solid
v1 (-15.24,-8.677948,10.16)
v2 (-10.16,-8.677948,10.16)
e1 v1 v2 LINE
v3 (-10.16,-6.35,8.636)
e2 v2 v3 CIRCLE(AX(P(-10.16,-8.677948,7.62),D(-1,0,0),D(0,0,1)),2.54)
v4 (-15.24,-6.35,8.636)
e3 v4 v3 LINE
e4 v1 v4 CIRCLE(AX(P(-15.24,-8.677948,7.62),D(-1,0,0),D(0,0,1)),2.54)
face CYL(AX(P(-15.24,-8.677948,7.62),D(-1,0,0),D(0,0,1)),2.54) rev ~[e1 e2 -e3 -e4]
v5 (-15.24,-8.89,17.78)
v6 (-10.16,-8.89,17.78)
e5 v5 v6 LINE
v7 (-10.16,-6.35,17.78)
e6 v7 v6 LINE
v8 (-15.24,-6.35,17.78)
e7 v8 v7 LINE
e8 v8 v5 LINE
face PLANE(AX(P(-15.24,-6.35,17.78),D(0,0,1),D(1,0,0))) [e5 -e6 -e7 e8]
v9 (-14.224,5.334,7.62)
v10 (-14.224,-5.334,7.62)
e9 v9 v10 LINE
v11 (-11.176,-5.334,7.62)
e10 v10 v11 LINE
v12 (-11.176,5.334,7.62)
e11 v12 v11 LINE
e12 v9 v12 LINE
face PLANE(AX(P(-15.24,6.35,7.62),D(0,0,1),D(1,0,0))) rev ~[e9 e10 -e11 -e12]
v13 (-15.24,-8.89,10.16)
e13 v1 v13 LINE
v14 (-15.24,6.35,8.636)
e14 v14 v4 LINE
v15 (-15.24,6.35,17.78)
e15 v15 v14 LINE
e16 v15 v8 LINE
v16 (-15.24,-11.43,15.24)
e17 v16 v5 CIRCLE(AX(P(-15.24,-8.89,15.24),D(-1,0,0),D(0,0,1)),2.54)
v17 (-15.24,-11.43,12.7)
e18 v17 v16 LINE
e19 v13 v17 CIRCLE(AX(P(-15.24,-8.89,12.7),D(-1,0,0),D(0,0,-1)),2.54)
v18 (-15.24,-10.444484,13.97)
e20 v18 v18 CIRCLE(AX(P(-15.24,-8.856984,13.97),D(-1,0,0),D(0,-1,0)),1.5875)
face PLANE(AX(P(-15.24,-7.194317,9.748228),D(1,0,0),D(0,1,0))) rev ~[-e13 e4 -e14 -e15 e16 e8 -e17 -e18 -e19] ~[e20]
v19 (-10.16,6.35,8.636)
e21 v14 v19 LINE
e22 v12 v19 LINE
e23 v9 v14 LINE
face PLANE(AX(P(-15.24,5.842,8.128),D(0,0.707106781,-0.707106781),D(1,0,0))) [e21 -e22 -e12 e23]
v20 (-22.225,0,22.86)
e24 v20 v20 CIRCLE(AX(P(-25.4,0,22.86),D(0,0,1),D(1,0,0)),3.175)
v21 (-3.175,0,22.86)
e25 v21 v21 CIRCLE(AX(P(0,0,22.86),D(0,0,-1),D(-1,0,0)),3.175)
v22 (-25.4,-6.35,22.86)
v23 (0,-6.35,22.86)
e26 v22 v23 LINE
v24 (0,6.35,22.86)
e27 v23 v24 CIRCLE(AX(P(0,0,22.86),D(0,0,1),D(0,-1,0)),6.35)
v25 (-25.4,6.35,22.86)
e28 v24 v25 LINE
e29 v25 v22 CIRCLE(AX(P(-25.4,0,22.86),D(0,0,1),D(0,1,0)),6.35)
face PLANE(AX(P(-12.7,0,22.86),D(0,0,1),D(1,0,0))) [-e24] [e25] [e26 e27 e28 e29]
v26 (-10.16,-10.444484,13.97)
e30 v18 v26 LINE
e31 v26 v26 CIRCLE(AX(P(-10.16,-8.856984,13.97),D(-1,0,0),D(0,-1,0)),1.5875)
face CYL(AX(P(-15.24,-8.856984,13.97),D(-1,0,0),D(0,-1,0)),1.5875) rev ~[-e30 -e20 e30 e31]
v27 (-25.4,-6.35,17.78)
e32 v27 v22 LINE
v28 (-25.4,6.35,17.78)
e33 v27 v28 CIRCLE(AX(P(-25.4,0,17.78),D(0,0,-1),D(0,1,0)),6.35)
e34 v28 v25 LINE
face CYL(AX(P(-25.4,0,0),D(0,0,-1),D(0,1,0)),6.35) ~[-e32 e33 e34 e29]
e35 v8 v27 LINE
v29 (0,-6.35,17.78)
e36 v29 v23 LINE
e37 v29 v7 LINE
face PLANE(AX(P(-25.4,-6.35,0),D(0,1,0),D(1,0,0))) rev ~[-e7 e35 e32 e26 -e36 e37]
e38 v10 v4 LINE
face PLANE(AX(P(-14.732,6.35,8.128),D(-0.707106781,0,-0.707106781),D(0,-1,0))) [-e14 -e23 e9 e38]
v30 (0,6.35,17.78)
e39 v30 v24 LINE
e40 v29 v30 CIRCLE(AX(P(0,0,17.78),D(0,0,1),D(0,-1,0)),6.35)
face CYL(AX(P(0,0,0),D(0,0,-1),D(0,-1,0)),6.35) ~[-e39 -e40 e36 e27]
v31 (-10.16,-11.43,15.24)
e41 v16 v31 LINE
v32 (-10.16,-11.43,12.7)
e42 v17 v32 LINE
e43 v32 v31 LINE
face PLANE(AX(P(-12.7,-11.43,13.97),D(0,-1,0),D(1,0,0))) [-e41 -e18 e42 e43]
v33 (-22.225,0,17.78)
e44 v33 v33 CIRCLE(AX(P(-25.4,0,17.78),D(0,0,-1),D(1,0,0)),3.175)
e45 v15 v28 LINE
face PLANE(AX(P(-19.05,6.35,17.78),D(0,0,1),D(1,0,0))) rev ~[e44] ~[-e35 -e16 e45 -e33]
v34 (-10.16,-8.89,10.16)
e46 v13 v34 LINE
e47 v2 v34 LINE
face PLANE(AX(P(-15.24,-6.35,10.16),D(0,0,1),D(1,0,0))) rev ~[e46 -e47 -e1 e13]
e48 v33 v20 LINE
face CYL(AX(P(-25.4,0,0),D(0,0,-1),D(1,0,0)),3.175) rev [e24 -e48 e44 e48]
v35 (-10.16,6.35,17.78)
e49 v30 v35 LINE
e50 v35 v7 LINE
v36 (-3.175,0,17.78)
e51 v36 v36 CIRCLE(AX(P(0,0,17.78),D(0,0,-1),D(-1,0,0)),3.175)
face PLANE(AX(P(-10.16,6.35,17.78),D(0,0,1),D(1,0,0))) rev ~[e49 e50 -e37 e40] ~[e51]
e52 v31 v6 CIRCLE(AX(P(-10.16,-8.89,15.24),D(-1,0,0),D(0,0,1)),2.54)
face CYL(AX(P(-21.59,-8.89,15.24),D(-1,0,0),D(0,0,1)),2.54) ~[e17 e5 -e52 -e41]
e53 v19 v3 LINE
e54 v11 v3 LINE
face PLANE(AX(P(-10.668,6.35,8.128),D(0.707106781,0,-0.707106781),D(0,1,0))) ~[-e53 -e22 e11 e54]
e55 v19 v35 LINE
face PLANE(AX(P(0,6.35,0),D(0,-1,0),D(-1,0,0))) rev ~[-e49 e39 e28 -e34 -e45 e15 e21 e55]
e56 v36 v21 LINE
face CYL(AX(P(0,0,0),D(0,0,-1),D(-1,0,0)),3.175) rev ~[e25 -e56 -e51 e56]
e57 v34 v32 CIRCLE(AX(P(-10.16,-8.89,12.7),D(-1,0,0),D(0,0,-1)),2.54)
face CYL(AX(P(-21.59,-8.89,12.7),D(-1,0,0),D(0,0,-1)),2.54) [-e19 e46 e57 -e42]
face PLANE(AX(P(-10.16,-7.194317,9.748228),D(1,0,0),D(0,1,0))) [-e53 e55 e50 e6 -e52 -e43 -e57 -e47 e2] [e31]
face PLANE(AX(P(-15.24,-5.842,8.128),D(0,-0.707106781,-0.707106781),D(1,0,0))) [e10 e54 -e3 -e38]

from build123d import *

# Parameters (mm, degrees)
F0_R         = 3.175
F1_DEPTH     = 22.86
F2_W         = 6.35
F2_H         = 6.35
F2_W_2       = 6.7925655007
F3_DEPTH     = 25.4
F5_DEPTH     = 25.4
F6_SIZE      = 1.016
F7_W         = 5.08
F7_H         = 7.62
F8_DEPTH     = 5.08
F9_R         = 1.5875
F10_DEPTH    = 25.4
F11_T1_DEPTH = 5.08
F11_T3_DEPTH = 17.78
F11_T5_DEPTH = 17.78


# Not quite as in the source:
# - a fillet or chamfer that OpenCascade refuses, or shapes differently, is made with other operations: its cross-section is extruded or revolved along the edge and cut away or added


with BuildPart() as f1:
    # F0 (on Top) → F1 (new body)
    with BuildSketch(Plane.XY):
        with BuildLine():
            Line((0, 6.35), (-25.4, 6.35))
            ThreePointArc((-25.4, 6.35), (-31.75, 0), (-25.4, -6.35))
            Line((-25.4, -6.35), (0, -6.35))
            ThreePointArc((0, -6.35), (6.35, 0), (0, 6.35))
        make_face()
        with Locations((-25.4, 0)):
            Circle(F0_R, mode=Mode.SUBTRACT)
        with BuildLine():
            ThreePointArc((3.175, 0), (0, -3.175), (-3.175, 0))
            ThreePointArc((-3.175, 0), (0, 3.175), (3.175, 0))
        make_face(mode=Mode.SUBTRACT)
    extrude(amount=F1_DEPTH)

    # F2 (on face) → F3 (cut)
    with BuildSketch(Plane(origin=(0, 6.35, 0), x_dir=(-1, 0, 0), z_dir=(0, 1, 0))):
        with Locations((-3.175, 8.255)):
            Rectangle(F2_W, F2_H)
        with Locations((28.7962827504, 14.605)):
            Rectangle(F2_W_2, F2_H)
        with Locations((28.7962827504, 8.255)):
            Rectangle(F2_W_2, F2_H)
        with Locations((3.175, 8.255)):
            Rectangle(F2_W, F2_H)
        with Locations((3.175, 14.605)):
            Rectangle(F2_W, F2_H)
        with Locations((22.225, 14.605)):
            Rectangle(F2_W, F2_H)
        with Locations((22.225, 8.255)):
            Rectangle(F2_W, F2_H)
        with Locations((-3.175, 14.605)):
            Rectangle(F2_W, F2_H)
    extrude(amount=-F3_DEPTH, mode=Mode.SUBTRACT)

    # F4 (on face) → F5 (cut)
    with BuildSketch(Plane(origin=(0, 6.35, 0), x_dir=(-1, 0, 0), z_dir=(0, 1, 0))):
        Polygon((10.16, 17.78), (6.35, 17.78), (-14.3396928906, 11.8959285319), (-15.9743130207, -5.6489794515), (34.4809181988, -5.6489794515), (40.5834950507, 3.3959113061), (19.05, 17.78), (15.24, 17.78), (15.24, 7.62), (10.16, 7.62), align=None)
    extrude(amount=-F5_DEPTH, mode=Mode.SUBTRACT)

    # F6
    f6_edges = [f1.edges().sort_by_distance(p)[0] for p in [
        (-15.24, 0, 7.62),
        (-10.16, 0, 7.62),
        (-12.7, -6.35, 7.62),
        (-12.7, 6.35, 7.62),
    ]]
    chamfer(f6_edges, length=F6_SIZE)

    # F7 (on face) → F8 (join)
    with BuildSketch(Plane.XZ.offset(6.35)):
        with Locations((-12.7, 13.97)):
            Rectangle(F7_W, F7_H)
    extrude(amount=F8_DEPTH)

    # F9 (on face) → F10 (cut)
    with BuildSketch(Plane(origin=(-15.24, 0, 0), x_dir=(0, -1, 0), z_dir=(-1, 0, 0))):
        with Locations((8.8569838554, 13.97)):
            Circle(F9_R)
    extrude(amount=-F10_DEPTH, mode=Mode.SUBTRACT)

    # F11: fillet of radius 2.54 on 3 edges, made by hand

    # F11_s2 → F11_t1 (join)
    with BuildSketch(Plane.YZ.offset(-15.24)):
        with BuildLine():
            ThreePointArc((-8.677948453, 10.16), (-7.286733157, 9.7451164674), (-6.35, 8.636))
            Line((-6.35, 8.636), (-6.35, 10.16))
            Line((-6.35, 10.16), (-8.677948453, 10.16))
        make_face()
    extrude(amount=F11_T1_DEPTH)

    # F11_s4 → F11_t3 (cut)
    with BuildSketch(Plane.YZ.offset(-21.59)):
        with BuildLine():
            ThreePointArc((-8.89, 17.78), (-10.6860512242, 17.0360512242), (-11.43, 15.24))
            Line((-11.43, 15.24), (-11.43, 17.78))
            Line((-11.43, 17.78), (-8.89, 17.78))
        make_face()
    extrude(amount=F11_T3_DEPTH, mode=Mode.SUBTRACT)

    # F11_s6 → F11_t5 (cut)
    with BuildSketch(Plane.YZ.offset(-21.59)):
        with BuildLine():
            ThreePointArc((-8.89, 10.16), (-10.6860512242, 10.9039487758), (-11.43, 12.7))
            Line((-11.43, 12.7), (-11.43, 10.16))
            Line((-11.43, 10.16), (-8.89, 10.16))
        make_face()
    extrude(amount=F11_T5_DEPTH, mode=Mode.SUBTRACT)


solid = f1.part
